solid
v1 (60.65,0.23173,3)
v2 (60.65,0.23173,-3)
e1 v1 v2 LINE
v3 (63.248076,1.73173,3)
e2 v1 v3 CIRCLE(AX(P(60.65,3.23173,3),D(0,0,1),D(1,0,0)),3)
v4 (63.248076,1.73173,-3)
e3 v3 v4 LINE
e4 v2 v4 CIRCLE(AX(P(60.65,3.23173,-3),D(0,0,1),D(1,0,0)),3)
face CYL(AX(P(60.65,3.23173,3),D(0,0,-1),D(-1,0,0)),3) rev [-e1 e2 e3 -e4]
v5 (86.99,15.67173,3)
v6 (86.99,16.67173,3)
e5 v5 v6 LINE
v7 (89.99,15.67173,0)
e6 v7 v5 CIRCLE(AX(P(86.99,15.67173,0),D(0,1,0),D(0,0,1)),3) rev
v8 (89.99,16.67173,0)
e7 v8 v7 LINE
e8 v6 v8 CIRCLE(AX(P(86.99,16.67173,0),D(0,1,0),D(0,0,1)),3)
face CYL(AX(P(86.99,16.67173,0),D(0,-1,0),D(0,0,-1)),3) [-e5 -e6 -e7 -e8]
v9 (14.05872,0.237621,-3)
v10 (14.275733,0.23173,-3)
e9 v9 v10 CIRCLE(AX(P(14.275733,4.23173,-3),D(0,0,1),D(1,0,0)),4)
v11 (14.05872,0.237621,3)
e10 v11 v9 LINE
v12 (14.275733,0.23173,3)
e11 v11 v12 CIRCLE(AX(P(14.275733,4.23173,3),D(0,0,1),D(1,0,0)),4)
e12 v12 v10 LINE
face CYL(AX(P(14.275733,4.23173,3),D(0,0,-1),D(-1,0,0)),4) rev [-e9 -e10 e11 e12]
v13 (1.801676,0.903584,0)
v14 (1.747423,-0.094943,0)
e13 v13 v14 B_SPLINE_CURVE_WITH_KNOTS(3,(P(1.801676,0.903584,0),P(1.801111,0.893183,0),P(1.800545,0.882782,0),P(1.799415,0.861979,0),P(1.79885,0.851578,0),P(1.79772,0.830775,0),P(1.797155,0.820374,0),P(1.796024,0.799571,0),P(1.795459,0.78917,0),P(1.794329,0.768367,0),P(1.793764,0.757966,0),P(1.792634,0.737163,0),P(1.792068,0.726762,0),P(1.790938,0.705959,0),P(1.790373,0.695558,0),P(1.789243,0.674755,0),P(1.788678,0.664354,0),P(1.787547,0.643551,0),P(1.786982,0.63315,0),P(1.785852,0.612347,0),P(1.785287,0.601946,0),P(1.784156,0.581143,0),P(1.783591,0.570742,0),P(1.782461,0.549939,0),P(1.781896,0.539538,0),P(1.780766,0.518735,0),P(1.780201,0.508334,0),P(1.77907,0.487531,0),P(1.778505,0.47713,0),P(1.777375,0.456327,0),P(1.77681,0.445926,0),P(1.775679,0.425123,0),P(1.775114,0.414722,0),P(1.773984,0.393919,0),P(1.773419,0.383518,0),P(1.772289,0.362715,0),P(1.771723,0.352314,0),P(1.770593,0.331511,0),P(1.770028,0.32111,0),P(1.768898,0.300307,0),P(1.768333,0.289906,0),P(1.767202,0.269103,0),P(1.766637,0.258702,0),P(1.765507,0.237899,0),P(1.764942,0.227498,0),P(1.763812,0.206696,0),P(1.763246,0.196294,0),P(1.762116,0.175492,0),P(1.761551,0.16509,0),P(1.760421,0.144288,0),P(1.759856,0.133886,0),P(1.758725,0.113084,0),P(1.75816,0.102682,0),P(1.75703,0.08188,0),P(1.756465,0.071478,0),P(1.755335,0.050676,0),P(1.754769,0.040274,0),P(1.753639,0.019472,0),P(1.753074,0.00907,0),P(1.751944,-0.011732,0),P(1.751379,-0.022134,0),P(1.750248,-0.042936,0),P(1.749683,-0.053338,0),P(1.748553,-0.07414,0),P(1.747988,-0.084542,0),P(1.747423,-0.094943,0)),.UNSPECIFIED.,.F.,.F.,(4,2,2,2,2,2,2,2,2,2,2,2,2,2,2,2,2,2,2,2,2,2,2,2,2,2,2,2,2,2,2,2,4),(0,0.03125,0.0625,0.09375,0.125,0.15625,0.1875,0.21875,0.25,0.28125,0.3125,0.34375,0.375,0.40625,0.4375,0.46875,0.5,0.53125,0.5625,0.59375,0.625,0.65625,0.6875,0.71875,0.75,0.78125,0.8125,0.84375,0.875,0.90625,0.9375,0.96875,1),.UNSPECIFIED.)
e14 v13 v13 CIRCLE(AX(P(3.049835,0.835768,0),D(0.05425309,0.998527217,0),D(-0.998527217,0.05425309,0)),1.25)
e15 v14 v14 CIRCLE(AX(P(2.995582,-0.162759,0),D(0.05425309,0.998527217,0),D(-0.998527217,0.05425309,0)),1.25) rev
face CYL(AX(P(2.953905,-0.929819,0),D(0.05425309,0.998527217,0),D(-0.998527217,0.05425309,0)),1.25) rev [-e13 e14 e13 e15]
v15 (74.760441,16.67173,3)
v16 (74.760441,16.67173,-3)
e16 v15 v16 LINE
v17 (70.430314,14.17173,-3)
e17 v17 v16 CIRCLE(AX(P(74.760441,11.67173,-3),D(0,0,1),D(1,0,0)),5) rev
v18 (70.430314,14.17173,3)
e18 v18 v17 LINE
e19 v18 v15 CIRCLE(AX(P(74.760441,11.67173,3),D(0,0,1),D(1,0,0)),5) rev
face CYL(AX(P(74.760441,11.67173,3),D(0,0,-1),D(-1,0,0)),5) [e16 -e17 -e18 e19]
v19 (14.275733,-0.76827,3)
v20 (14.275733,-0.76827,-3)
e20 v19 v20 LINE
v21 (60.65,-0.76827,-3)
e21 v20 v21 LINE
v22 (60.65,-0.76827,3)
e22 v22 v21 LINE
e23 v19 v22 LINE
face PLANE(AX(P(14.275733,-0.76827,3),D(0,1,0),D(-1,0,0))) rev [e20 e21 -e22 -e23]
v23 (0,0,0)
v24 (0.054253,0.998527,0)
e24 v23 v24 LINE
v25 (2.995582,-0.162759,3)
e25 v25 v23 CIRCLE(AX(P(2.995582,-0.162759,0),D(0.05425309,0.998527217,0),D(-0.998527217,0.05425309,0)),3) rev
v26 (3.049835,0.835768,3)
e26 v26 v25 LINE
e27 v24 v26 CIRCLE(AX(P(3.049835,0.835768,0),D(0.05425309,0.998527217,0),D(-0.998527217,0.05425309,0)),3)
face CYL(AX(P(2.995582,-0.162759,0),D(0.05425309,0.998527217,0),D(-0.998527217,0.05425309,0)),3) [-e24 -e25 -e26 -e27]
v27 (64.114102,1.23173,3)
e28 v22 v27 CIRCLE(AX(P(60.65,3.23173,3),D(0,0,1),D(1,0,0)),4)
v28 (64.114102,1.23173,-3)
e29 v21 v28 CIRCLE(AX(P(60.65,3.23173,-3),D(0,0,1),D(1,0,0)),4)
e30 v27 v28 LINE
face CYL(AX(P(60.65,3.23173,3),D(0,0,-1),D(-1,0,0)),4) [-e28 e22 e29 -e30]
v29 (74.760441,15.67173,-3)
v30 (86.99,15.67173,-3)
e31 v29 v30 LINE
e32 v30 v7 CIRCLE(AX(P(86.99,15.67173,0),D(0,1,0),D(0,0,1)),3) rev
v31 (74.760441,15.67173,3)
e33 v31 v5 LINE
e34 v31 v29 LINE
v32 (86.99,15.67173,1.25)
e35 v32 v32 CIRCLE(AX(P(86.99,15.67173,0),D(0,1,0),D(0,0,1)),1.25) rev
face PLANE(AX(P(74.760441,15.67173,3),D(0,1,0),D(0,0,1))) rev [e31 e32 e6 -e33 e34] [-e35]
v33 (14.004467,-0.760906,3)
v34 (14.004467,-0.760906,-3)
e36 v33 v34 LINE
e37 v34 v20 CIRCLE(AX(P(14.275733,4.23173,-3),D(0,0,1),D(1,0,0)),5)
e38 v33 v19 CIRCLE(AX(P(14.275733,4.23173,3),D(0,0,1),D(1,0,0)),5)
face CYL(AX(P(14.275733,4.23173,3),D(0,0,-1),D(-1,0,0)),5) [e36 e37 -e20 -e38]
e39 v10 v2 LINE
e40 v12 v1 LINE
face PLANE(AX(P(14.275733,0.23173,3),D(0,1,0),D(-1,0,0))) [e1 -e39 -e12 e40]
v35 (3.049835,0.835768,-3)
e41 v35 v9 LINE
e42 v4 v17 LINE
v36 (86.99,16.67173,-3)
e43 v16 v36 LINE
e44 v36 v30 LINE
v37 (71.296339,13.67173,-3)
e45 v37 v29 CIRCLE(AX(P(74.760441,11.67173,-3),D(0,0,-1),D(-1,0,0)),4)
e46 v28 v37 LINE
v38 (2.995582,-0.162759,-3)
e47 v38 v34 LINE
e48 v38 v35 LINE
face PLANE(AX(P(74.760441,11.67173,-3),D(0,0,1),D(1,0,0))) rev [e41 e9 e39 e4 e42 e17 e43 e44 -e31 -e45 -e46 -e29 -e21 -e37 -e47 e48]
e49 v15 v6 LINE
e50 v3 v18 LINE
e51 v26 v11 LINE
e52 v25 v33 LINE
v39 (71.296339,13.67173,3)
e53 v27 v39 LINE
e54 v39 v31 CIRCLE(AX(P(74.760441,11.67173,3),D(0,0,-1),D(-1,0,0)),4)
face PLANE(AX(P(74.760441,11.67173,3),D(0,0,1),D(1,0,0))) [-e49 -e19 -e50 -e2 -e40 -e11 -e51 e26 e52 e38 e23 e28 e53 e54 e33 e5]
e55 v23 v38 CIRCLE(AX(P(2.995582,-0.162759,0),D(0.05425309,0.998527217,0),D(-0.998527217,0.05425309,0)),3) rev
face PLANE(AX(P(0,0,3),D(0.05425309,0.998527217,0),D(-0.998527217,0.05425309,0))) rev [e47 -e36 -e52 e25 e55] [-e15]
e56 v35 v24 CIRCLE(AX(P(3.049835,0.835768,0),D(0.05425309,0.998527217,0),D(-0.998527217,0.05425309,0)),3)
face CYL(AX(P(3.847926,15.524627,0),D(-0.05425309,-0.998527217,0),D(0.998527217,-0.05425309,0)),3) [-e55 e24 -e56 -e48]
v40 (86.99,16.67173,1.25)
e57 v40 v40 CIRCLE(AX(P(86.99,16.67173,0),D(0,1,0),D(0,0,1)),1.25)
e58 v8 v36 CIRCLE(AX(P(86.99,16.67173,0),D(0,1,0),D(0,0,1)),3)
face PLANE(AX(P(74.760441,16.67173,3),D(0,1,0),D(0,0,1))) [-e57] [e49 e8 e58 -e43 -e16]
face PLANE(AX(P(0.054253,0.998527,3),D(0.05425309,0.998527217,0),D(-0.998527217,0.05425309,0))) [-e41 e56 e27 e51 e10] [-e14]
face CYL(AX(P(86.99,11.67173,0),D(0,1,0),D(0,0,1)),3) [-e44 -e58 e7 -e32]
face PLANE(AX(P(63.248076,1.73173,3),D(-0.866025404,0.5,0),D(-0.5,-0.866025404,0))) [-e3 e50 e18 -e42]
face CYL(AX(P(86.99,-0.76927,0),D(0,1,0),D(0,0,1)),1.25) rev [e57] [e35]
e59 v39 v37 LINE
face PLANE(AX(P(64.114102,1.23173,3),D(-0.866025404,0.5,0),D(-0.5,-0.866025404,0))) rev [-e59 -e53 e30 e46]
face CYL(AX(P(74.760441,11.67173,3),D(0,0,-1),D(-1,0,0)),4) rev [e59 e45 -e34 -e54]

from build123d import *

# Parameters (mm, degrees)
EXTRUDE_THIN1_DEPTH = 3
CUT_EXTRUDE1_REACH  = 93.341
SKETCH2_R           = 1.25
CUT_EXTRUDE2_REACH  = 93.713
SKETCH3_R           = 1.25
FILLET1_R           = 3


with BuildPart() as part:
    # Sketch1 → Extrude-Thin1 (new, symmetric)
    with BuildSketch(Plane.XY):
        with BuildLine():
            Line((0, 0), (14.004467228, -0.760906267))
            ThreePointArc((14.004467228, -0.760906267), (14.140049985, -0.766428865), (14.275732677, -0.768270184))
            Line((14.275732677, -0.768270184), (60.65, -0.768270184))
            ThreePointArc((60.65, -0.768270184), (62.65, -0.232371799), (64.114101615, 1.231729816))
            Line((64.114101615, 1.231729816), (71.296338964, 13.671729816))
            ThreePointArc((71.296338964, 13.671729816), (72.760440579, 15.135831431), (74.760440579, 15.671729816))
            Line((74.760440579, 15.671729816), (89.99, 15.671729816))
            Line((89.99, 15.671729816), (89.99, 16.671729816))
            Line((89.99, 16.671729816), (74.760440579, 16.671729816))
            ThreePointArc((74.760440579, 16.671729816), (72.260440579, 16.001856835), (70.43031356, 14.171729816))
            Line((70.43031356, 14.171729816), (63.248076211, 1.731729816))
            ThreePointArc((63.248076211, 1.731729816), (62.15, 0.633653605), (60.65, 0.231729816))
            Line((60.65, 0.231729816), (14.275732677, 0.231729816))
            ThreePointArc((14.275732677, 0.231729816), (14.167186524, 0.233202871), (14.058720318, 0.23762095))
            Line((14.058720318, 0.23762095), (0.05425309, 0.998527217))
            Line((0.05425309, 0.998527217), (0, 0))
        make_face()
    extrude(amount=EXTRUDE_THIN1_DEPTH, both=True)

    # Sketch2 → Cut-Extrude1 (cut, up to next)
    with BuildSketch(Plane(origin=(0.054253089686214166, 0.9985272165842555, 0), x_dir=(0.998527216584255, -0.05425308968621415, 0), z_dir=(0.054253089686214145, 0.9985272165842549, 0)), mode=Mode.PRIVATE) as cut_extrude1_sk1:
        with Locations(Location((3, 0, 0), (0, 0, 180))):
            Circle(SKETCH2_R)
    cut_extrude1_tool1 = extrude(cut_extrude1_sk1.sketch, amount=-CUT_EXTRUDE1_REACH, mode=Mode.PRIVATE) & part.part
    add(cut_extrude1_tool1.solids().sort_by_distance((3.049835, 0.835768, 0))[0], mode=Mode.SUBTRACT)

    # Sketch3 → Cut-Extrude2 (cut, up to next)
    with BuildSketch(Plane(origin=(0, 16.671729816, 0), x_dir=(1, 0, 0), z_dir=(0, 1, 0)), mode=Mode.PRIVATE) as cut_extrude2_sk1:
        with Locations(Location((86.99, 0, 0), (0, 0, 270))):
            Circle(SKETCH3_R)
    cut_extrude2_tool1 = extrude(cut_extrude2_sk1.sketch, amount=-CUT_EXTRUDE2_REACH, mode=Mode.PRIVATE) & part.part
    add(cut_extrude2_tool1.solids().sort_by_distance((86.99, 16.67173, 0))[0], mode=Mode.SUBTRACT)

    # Fillet1
    fillet1_edges = [part.edges().sort_by_distance(p)[0] for p in [
        (0.027126545, 0.499263608, -3),
        (0.027126545, 0.499263608, 3),
        (89.99, 16.171729816, -3),
        (89.99, 16.171729816, 3),
    ]]
    fillet(fillet1_edges, radius=FILLET1_R - 0.0001)  # a hair under: the kernel refuses the full size


solid = part.part
